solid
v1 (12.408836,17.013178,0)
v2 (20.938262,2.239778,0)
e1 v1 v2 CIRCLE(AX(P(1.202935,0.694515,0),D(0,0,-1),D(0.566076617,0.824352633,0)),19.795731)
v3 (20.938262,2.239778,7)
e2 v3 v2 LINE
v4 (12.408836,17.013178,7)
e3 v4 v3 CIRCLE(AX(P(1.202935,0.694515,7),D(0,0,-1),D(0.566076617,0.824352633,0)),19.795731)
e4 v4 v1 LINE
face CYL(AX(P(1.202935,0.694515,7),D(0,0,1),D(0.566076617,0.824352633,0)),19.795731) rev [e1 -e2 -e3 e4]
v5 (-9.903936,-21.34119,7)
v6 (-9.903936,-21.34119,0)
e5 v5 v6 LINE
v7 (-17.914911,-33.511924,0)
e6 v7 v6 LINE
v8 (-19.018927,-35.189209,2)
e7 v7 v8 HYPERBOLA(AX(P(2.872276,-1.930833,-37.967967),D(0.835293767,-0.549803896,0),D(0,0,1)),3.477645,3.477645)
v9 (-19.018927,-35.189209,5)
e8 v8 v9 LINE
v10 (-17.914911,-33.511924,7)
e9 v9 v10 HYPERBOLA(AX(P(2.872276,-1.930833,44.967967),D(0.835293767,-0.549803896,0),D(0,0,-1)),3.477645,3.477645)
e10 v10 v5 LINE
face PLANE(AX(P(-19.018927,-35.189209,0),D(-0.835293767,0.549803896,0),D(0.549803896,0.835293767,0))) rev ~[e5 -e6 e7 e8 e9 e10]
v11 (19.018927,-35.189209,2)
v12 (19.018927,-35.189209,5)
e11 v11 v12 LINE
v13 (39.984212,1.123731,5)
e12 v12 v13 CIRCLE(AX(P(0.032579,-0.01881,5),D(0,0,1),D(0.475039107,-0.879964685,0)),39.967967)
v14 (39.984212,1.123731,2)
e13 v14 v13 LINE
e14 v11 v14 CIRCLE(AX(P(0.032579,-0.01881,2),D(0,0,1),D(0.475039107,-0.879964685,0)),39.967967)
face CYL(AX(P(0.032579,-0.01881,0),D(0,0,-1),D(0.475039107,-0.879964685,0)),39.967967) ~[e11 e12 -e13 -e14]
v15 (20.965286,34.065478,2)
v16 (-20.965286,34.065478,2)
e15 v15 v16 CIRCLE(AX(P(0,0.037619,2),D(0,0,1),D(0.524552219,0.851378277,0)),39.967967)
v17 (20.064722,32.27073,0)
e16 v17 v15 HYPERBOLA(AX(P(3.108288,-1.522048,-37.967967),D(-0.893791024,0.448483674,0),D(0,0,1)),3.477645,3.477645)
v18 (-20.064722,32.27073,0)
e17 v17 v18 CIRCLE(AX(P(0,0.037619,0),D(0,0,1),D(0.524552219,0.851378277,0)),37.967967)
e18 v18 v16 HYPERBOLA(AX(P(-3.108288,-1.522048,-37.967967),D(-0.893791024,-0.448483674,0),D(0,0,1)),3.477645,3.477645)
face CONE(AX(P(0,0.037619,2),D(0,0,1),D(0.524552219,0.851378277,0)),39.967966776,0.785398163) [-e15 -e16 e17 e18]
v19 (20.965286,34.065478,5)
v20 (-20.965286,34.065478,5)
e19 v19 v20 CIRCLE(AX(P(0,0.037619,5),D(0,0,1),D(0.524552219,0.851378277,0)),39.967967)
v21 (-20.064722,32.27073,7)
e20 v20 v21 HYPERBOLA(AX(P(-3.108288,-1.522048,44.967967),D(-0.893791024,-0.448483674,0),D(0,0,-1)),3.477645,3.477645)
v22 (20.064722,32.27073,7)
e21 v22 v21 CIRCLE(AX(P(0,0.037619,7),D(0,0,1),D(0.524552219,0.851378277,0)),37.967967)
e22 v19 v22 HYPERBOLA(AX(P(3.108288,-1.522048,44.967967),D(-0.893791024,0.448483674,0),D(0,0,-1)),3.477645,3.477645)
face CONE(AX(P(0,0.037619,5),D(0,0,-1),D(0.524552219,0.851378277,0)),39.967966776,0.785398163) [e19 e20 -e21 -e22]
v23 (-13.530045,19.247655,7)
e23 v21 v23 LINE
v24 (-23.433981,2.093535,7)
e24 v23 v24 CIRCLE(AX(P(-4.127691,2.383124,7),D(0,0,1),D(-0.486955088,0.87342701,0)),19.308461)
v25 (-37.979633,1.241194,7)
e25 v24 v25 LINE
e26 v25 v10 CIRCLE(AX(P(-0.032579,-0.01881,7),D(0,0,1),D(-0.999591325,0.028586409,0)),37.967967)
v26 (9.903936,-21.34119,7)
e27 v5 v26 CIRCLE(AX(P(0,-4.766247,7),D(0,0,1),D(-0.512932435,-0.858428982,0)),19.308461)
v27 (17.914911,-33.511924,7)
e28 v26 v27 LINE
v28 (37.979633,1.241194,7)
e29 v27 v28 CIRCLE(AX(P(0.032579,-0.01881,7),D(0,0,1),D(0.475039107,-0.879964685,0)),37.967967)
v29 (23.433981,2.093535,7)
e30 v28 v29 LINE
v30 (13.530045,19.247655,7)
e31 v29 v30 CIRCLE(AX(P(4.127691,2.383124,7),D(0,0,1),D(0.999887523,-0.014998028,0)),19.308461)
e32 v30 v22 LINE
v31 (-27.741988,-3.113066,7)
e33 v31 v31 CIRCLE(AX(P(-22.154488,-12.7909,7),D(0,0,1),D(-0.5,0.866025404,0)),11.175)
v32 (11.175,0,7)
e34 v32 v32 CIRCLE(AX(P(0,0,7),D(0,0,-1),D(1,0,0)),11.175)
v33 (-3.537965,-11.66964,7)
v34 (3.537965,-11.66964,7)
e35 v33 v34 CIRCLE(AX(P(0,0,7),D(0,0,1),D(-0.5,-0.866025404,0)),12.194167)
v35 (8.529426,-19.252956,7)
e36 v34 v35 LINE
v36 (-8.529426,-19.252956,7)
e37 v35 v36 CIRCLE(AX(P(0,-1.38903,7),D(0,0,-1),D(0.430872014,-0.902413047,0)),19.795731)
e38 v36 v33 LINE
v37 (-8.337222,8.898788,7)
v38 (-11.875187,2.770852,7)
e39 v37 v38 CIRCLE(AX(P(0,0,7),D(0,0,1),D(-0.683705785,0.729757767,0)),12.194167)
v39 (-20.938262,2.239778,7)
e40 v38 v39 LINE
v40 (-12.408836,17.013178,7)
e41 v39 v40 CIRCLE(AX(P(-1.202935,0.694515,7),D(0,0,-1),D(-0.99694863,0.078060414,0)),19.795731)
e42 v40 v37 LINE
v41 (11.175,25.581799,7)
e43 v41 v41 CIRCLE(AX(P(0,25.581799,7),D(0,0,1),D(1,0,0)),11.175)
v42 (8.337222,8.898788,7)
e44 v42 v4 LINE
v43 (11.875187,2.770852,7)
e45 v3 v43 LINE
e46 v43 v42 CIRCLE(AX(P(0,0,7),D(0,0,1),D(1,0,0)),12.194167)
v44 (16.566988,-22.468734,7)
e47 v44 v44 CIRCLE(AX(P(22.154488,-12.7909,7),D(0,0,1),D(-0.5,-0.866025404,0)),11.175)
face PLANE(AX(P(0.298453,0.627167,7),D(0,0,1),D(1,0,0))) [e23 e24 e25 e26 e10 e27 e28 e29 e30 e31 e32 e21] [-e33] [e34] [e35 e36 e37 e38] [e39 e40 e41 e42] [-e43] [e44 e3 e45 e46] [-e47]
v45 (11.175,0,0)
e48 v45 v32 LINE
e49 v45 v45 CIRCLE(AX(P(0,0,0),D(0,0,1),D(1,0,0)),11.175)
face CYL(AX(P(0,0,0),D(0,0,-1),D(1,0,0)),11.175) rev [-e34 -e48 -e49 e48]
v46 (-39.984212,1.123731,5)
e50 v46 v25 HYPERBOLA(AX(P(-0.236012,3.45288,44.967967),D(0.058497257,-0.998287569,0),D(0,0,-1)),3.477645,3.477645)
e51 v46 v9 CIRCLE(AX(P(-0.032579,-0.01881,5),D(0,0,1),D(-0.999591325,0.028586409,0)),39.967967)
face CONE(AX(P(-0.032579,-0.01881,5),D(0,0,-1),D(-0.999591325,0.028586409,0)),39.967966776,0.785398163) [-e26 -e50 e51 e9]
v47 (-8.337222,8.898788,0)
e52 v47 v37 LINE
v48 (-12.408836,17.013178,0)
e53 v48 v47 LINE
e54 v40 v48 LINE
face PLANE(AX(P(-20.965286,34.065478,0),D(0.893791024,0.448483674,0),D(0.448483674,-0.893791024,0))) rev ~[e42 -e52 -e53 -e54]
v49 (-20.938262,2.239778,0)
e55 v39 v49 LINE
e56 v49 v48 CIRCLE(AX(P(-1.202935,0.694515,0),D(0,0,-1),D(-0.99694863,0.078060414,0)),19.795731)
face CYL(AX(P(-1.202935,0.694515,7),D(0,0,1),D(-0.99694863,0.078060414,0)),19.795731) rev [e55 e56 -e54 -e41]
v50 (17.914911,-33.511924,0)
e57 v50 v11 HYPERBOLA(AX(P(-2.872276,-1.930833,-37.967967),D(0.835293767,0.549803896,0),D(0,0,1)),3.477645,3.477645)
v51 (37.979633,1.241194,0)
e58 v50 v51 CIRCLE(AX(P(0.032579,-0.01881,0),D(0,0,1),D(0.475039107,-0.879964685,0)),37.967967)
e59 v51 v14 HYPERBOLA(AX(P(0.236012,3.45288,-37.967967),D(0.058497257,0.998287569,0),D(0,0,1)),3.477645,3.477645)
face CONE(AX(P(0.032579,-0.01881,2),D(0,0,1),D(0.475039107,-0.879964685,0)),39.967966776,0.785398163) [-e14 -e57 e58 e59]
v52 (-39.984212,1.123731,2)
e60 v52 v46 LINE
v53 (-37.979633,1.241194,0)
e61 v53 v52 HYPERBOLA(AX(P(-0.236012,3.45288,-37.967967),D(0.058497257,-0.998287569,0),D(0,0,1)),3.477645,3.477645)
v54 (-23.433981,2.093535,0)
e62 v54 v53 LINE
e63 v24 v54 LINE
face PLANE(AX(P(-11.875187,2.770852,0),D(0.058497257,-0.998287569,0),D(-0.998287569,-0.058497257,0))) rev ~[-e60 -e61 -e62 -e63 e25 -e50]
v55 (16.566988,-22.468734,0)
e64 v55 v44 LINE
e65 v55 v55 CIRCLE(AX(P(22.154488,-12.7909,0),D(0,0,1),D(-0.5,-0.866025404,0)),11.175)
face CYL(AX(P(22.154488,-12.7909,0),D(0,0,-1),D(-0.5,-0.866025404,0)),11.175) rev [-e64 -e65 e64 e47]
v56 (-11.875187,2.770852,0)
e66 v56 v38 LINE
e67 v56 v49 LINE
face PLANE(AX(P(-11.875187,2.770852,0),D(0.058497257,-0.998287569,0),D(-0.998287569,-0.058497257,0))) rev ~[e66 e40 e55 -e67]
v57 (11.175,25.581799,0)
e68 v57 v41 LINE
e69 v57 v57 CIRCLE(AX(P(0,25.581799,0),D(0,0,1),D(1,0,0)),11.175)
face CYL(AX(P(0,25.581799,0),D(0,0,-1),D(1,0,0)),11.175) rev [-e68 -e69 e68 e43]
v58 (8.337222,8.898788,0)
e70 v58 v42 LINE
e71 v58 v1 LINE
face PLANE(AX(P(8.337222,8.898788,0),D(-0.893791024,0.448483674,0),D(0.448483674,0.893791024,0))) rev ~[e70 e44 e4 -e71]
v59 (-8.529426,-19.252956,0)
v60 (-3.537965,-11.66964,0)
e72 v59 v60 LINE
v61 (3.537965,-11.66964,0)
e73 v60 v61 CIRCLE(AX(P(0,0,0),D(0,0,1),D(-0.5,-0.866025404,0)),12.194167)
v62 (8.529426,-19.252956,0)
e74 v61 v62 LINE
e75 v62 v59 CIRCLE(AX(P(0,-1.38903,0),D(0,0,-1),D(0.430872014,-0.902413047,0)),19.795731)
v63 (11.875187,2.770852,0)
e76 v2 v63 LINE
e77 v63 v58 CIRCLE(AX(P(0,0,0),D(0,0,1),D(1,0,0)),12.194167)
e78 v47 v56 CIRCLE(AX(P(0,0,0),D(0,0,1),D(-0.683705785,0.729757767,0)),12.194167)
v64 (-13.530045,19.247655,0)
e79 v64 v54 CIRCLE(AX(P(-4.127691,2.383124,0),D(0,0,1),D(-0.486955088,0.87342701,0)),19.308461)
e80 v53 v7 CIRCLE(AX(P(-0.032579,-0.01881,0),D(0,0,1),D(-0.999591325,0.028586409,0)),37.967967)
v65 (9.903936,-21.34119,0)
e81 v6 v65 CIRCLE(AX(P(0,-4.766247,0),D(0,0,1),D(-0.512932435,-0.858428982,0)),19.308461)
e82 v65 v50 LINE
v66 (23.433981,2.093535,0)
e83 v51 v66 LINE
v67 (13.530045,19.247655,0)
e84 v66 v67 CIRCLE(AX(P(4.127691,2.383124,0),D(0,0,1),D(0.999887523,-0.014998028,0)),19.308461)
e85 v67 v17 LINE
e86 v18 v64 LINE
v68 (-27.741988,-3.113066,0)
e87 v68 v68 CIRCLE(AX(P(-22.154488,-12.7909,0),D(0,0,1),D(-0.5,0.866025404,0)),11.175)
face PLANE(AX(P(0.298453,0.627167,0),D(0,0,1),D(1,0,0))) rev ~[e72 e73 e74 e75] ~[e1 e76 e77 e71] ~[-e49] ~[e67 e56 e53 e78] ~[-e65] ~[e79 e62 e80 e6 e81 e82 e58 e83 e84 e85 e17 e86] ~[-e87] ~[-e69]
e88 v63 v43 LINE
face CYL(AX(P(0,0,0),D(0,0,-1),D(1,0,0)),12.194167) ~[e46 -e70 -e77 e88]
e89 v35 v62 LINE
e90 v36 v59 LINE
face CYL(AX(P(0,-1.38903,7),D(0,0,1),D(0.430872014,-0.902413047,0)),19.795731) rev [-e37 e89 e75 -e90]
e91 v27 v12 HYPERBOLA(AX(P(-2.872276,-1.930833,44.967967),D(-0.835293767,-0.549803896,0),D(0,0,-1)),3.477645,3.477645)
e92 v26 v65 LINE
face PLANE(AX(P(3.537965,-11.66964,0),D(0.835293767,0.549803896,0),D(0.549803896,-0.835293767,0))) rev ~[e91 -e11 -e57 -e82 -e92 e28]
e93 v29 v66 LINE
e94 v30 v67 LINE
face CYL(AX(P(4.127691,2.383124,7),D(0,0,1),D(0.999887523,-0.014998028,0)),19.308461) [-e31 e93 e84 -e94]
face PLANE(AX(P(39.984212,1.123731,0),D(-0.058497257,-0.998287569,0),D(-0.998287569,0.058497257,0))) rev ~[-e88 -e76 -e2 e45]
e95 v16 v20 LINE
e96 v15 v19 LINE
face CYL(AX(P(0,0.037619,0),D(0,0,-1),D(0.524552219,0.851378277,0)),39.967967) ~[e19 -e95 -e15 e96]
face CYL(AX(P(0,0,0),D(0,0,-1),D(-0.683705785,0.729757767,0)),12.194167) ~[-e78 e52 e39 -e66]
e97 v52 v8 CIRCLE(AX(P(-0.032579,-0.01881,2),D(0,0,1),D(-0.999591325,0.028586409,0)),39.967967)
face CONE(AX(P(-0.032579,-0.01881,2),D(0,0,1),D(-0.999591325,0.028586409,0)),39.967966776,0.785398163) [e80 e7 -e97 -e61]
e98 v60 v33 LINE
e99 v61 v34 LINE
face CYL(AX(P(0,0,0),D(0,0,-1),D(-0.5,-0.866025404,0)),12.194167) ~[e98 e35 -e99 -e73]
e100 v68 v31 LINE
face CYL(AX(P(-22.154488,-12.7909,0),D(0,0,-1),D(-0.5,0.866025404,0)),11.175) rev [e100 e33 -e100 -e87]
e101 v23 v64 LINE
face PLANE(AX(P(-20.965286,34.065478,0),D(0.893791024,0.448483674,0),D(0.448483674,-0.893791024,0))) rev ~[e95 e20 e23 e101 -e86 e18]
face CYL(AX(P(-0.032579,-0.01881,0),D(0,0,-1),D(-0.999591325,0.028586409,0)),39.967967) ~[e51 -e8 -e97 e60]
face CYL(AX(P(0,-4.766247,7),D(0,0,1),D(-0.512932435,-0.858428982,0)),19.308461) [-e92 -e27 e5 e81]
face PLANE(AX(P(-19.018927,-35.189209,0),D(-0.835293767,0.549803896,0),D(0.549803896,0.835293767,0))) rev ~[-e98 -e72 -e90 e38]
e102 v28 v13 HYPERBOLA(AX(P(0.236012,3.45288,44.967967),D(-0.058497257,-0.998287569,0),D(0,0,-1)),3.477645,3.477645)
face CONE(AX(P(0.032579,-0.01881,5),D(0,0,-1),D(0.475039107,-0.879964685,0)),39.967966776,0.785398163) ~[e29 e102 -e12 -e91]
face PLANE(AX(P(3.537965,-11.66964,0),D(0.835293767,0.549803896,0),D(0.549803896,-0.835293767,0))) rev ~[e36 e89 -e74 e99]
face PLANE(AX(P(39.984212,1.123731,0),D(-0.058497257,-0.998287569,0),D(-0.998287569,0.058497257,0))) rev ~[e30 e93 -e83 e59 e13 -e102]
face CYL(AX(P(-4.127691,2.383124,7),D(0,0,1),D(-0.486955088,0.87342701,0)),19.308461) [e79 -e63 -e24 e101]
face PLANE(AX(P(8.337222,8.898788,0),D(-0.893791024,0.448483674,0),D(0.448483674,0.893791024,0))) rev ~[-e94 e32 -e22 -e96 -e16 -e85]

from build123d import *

# Parameters (mm, degrees)
F0_R            = 11.175
F1_DEPTH        = 7
F2_COUNT        = 3
F4_DEPTH        = 7
F4_COPIES_COUNT = 3
F5_SIZE         = 2
F6_SIZE         = 2
F7_SIZE         = 2


# Not quite as in the source:
# - a pattern or mirror of a feature is missing from the dataset's text; its kind, count and spacing are read off the source's solid


with BuildPart() as f1:
    # F0 (on Top) → F1 (new body)
    with BuildSketch(Plane.XY):
        with BuildLine():
            ThreePointArc((-8.3372222223, 8.8987877603), (-4.8493412747, -11.1884577663), (12.1941665556, 0))
            ThreePointArc((12.1941665556, 0), (11.1884577663, 4.8493412747), (8.3372222223, 8.8987877603))
            ThreePointArc((8.3372222223, 8.8987877603), (0, 12.1941665556), (-8.3372222223, 8.8987877603))
        make_face()
        Circle(F0_R, mode=Mode.SUBTRACT)
        with BuildLine():
            ThreePointArc((-8.3372222223, 8.8987877603), (0, 12.1941665556), (8.3372222223, 8.8987877603))
            Line((8.3372222223, 8.8987877603), (20.9652856439, 34.0654780954))
            ThreePointArc((20.9652856439, 34.0654780954), (0, 40.0055861953), (-20.9652856439, 34.0654780954))
            Line((-20.9652856439, 34.0654780954), (-8.3372222223, 8.8987877603))
        make_face()
        with Locations((0, 25.5817994475)):
            Circle(F0_R, mode=Mode.SUBTRACT)
    extrude(amount=F1_DEPTH)

    # F2: F1 ×3 about axis
    f2_axis = Axis((0, 0, 0), (0, 0, -1))


with BuildPart() as f1_1:
    add(f1.part)
    for i in range(1, F2_COUNT):
        add(f1.part.rotate(f2_axis, i * 360 / F2_COUNT))

    # F3 (on face) → F4 (join)
    with BuildSketch(Plane.XY.offset(7)):
        with BuildLine():
            Line((-8.5294263987, -19.2529557346), (-9.9039361375, -21.3411901509))
            ThreePointArc((-9.9039361375, -21.3411901509), (0, -24.0747086913), (9.9039361375, -21.3411901509))
            Line((9.9039361375, -21.3411901509), (8.5294263987, -19.2529557346))
            ThreePointArc((8.5294263987, -19.2529557346), (0, -21.1847607817), (-8.5294263987, -19.2529557346))
        make_face()
    f4 = extrude(amount=-F4_DEPTH)

    # F4_copies: F4 ×3 about axis
    f4_copies_axis = Axis((0, 0, 0), (0, 0, 1))
    for i in range(1, F4_COPIES_COUNT):
        add(f4.rotate(f4_copies_axis, i * 360 / F4_COPIES_COUNT))

    # F5
    f5_edges = [f1_1.edges().sort_by_distance(p)[0] for p in [
        (34.645854, -20.002793, 7),
        (34.645854, -20.002793, 0),
    ]]
    chamfer(f5_edges, length=F5_SIZE)

    # F6
    f6_edges = [f1_1.edges().sort_by_distance(p)[0] for p in [
        (-34.645854, -20.002793, 7),
        (-34.645854, -20.002793, 0),
    ]]
    chamfer(f6_edges, length=F6_SIZE)

    # F7
    f7_edges = [f1_1.edges().sort_by_distance(p)[0] for p in [
        (0, 40.005586, 7),
        (0, 40.005586, 0),
    ]]
    chamfer(f7_edges, length=F7_SIZE)


solid = f1_1.part
